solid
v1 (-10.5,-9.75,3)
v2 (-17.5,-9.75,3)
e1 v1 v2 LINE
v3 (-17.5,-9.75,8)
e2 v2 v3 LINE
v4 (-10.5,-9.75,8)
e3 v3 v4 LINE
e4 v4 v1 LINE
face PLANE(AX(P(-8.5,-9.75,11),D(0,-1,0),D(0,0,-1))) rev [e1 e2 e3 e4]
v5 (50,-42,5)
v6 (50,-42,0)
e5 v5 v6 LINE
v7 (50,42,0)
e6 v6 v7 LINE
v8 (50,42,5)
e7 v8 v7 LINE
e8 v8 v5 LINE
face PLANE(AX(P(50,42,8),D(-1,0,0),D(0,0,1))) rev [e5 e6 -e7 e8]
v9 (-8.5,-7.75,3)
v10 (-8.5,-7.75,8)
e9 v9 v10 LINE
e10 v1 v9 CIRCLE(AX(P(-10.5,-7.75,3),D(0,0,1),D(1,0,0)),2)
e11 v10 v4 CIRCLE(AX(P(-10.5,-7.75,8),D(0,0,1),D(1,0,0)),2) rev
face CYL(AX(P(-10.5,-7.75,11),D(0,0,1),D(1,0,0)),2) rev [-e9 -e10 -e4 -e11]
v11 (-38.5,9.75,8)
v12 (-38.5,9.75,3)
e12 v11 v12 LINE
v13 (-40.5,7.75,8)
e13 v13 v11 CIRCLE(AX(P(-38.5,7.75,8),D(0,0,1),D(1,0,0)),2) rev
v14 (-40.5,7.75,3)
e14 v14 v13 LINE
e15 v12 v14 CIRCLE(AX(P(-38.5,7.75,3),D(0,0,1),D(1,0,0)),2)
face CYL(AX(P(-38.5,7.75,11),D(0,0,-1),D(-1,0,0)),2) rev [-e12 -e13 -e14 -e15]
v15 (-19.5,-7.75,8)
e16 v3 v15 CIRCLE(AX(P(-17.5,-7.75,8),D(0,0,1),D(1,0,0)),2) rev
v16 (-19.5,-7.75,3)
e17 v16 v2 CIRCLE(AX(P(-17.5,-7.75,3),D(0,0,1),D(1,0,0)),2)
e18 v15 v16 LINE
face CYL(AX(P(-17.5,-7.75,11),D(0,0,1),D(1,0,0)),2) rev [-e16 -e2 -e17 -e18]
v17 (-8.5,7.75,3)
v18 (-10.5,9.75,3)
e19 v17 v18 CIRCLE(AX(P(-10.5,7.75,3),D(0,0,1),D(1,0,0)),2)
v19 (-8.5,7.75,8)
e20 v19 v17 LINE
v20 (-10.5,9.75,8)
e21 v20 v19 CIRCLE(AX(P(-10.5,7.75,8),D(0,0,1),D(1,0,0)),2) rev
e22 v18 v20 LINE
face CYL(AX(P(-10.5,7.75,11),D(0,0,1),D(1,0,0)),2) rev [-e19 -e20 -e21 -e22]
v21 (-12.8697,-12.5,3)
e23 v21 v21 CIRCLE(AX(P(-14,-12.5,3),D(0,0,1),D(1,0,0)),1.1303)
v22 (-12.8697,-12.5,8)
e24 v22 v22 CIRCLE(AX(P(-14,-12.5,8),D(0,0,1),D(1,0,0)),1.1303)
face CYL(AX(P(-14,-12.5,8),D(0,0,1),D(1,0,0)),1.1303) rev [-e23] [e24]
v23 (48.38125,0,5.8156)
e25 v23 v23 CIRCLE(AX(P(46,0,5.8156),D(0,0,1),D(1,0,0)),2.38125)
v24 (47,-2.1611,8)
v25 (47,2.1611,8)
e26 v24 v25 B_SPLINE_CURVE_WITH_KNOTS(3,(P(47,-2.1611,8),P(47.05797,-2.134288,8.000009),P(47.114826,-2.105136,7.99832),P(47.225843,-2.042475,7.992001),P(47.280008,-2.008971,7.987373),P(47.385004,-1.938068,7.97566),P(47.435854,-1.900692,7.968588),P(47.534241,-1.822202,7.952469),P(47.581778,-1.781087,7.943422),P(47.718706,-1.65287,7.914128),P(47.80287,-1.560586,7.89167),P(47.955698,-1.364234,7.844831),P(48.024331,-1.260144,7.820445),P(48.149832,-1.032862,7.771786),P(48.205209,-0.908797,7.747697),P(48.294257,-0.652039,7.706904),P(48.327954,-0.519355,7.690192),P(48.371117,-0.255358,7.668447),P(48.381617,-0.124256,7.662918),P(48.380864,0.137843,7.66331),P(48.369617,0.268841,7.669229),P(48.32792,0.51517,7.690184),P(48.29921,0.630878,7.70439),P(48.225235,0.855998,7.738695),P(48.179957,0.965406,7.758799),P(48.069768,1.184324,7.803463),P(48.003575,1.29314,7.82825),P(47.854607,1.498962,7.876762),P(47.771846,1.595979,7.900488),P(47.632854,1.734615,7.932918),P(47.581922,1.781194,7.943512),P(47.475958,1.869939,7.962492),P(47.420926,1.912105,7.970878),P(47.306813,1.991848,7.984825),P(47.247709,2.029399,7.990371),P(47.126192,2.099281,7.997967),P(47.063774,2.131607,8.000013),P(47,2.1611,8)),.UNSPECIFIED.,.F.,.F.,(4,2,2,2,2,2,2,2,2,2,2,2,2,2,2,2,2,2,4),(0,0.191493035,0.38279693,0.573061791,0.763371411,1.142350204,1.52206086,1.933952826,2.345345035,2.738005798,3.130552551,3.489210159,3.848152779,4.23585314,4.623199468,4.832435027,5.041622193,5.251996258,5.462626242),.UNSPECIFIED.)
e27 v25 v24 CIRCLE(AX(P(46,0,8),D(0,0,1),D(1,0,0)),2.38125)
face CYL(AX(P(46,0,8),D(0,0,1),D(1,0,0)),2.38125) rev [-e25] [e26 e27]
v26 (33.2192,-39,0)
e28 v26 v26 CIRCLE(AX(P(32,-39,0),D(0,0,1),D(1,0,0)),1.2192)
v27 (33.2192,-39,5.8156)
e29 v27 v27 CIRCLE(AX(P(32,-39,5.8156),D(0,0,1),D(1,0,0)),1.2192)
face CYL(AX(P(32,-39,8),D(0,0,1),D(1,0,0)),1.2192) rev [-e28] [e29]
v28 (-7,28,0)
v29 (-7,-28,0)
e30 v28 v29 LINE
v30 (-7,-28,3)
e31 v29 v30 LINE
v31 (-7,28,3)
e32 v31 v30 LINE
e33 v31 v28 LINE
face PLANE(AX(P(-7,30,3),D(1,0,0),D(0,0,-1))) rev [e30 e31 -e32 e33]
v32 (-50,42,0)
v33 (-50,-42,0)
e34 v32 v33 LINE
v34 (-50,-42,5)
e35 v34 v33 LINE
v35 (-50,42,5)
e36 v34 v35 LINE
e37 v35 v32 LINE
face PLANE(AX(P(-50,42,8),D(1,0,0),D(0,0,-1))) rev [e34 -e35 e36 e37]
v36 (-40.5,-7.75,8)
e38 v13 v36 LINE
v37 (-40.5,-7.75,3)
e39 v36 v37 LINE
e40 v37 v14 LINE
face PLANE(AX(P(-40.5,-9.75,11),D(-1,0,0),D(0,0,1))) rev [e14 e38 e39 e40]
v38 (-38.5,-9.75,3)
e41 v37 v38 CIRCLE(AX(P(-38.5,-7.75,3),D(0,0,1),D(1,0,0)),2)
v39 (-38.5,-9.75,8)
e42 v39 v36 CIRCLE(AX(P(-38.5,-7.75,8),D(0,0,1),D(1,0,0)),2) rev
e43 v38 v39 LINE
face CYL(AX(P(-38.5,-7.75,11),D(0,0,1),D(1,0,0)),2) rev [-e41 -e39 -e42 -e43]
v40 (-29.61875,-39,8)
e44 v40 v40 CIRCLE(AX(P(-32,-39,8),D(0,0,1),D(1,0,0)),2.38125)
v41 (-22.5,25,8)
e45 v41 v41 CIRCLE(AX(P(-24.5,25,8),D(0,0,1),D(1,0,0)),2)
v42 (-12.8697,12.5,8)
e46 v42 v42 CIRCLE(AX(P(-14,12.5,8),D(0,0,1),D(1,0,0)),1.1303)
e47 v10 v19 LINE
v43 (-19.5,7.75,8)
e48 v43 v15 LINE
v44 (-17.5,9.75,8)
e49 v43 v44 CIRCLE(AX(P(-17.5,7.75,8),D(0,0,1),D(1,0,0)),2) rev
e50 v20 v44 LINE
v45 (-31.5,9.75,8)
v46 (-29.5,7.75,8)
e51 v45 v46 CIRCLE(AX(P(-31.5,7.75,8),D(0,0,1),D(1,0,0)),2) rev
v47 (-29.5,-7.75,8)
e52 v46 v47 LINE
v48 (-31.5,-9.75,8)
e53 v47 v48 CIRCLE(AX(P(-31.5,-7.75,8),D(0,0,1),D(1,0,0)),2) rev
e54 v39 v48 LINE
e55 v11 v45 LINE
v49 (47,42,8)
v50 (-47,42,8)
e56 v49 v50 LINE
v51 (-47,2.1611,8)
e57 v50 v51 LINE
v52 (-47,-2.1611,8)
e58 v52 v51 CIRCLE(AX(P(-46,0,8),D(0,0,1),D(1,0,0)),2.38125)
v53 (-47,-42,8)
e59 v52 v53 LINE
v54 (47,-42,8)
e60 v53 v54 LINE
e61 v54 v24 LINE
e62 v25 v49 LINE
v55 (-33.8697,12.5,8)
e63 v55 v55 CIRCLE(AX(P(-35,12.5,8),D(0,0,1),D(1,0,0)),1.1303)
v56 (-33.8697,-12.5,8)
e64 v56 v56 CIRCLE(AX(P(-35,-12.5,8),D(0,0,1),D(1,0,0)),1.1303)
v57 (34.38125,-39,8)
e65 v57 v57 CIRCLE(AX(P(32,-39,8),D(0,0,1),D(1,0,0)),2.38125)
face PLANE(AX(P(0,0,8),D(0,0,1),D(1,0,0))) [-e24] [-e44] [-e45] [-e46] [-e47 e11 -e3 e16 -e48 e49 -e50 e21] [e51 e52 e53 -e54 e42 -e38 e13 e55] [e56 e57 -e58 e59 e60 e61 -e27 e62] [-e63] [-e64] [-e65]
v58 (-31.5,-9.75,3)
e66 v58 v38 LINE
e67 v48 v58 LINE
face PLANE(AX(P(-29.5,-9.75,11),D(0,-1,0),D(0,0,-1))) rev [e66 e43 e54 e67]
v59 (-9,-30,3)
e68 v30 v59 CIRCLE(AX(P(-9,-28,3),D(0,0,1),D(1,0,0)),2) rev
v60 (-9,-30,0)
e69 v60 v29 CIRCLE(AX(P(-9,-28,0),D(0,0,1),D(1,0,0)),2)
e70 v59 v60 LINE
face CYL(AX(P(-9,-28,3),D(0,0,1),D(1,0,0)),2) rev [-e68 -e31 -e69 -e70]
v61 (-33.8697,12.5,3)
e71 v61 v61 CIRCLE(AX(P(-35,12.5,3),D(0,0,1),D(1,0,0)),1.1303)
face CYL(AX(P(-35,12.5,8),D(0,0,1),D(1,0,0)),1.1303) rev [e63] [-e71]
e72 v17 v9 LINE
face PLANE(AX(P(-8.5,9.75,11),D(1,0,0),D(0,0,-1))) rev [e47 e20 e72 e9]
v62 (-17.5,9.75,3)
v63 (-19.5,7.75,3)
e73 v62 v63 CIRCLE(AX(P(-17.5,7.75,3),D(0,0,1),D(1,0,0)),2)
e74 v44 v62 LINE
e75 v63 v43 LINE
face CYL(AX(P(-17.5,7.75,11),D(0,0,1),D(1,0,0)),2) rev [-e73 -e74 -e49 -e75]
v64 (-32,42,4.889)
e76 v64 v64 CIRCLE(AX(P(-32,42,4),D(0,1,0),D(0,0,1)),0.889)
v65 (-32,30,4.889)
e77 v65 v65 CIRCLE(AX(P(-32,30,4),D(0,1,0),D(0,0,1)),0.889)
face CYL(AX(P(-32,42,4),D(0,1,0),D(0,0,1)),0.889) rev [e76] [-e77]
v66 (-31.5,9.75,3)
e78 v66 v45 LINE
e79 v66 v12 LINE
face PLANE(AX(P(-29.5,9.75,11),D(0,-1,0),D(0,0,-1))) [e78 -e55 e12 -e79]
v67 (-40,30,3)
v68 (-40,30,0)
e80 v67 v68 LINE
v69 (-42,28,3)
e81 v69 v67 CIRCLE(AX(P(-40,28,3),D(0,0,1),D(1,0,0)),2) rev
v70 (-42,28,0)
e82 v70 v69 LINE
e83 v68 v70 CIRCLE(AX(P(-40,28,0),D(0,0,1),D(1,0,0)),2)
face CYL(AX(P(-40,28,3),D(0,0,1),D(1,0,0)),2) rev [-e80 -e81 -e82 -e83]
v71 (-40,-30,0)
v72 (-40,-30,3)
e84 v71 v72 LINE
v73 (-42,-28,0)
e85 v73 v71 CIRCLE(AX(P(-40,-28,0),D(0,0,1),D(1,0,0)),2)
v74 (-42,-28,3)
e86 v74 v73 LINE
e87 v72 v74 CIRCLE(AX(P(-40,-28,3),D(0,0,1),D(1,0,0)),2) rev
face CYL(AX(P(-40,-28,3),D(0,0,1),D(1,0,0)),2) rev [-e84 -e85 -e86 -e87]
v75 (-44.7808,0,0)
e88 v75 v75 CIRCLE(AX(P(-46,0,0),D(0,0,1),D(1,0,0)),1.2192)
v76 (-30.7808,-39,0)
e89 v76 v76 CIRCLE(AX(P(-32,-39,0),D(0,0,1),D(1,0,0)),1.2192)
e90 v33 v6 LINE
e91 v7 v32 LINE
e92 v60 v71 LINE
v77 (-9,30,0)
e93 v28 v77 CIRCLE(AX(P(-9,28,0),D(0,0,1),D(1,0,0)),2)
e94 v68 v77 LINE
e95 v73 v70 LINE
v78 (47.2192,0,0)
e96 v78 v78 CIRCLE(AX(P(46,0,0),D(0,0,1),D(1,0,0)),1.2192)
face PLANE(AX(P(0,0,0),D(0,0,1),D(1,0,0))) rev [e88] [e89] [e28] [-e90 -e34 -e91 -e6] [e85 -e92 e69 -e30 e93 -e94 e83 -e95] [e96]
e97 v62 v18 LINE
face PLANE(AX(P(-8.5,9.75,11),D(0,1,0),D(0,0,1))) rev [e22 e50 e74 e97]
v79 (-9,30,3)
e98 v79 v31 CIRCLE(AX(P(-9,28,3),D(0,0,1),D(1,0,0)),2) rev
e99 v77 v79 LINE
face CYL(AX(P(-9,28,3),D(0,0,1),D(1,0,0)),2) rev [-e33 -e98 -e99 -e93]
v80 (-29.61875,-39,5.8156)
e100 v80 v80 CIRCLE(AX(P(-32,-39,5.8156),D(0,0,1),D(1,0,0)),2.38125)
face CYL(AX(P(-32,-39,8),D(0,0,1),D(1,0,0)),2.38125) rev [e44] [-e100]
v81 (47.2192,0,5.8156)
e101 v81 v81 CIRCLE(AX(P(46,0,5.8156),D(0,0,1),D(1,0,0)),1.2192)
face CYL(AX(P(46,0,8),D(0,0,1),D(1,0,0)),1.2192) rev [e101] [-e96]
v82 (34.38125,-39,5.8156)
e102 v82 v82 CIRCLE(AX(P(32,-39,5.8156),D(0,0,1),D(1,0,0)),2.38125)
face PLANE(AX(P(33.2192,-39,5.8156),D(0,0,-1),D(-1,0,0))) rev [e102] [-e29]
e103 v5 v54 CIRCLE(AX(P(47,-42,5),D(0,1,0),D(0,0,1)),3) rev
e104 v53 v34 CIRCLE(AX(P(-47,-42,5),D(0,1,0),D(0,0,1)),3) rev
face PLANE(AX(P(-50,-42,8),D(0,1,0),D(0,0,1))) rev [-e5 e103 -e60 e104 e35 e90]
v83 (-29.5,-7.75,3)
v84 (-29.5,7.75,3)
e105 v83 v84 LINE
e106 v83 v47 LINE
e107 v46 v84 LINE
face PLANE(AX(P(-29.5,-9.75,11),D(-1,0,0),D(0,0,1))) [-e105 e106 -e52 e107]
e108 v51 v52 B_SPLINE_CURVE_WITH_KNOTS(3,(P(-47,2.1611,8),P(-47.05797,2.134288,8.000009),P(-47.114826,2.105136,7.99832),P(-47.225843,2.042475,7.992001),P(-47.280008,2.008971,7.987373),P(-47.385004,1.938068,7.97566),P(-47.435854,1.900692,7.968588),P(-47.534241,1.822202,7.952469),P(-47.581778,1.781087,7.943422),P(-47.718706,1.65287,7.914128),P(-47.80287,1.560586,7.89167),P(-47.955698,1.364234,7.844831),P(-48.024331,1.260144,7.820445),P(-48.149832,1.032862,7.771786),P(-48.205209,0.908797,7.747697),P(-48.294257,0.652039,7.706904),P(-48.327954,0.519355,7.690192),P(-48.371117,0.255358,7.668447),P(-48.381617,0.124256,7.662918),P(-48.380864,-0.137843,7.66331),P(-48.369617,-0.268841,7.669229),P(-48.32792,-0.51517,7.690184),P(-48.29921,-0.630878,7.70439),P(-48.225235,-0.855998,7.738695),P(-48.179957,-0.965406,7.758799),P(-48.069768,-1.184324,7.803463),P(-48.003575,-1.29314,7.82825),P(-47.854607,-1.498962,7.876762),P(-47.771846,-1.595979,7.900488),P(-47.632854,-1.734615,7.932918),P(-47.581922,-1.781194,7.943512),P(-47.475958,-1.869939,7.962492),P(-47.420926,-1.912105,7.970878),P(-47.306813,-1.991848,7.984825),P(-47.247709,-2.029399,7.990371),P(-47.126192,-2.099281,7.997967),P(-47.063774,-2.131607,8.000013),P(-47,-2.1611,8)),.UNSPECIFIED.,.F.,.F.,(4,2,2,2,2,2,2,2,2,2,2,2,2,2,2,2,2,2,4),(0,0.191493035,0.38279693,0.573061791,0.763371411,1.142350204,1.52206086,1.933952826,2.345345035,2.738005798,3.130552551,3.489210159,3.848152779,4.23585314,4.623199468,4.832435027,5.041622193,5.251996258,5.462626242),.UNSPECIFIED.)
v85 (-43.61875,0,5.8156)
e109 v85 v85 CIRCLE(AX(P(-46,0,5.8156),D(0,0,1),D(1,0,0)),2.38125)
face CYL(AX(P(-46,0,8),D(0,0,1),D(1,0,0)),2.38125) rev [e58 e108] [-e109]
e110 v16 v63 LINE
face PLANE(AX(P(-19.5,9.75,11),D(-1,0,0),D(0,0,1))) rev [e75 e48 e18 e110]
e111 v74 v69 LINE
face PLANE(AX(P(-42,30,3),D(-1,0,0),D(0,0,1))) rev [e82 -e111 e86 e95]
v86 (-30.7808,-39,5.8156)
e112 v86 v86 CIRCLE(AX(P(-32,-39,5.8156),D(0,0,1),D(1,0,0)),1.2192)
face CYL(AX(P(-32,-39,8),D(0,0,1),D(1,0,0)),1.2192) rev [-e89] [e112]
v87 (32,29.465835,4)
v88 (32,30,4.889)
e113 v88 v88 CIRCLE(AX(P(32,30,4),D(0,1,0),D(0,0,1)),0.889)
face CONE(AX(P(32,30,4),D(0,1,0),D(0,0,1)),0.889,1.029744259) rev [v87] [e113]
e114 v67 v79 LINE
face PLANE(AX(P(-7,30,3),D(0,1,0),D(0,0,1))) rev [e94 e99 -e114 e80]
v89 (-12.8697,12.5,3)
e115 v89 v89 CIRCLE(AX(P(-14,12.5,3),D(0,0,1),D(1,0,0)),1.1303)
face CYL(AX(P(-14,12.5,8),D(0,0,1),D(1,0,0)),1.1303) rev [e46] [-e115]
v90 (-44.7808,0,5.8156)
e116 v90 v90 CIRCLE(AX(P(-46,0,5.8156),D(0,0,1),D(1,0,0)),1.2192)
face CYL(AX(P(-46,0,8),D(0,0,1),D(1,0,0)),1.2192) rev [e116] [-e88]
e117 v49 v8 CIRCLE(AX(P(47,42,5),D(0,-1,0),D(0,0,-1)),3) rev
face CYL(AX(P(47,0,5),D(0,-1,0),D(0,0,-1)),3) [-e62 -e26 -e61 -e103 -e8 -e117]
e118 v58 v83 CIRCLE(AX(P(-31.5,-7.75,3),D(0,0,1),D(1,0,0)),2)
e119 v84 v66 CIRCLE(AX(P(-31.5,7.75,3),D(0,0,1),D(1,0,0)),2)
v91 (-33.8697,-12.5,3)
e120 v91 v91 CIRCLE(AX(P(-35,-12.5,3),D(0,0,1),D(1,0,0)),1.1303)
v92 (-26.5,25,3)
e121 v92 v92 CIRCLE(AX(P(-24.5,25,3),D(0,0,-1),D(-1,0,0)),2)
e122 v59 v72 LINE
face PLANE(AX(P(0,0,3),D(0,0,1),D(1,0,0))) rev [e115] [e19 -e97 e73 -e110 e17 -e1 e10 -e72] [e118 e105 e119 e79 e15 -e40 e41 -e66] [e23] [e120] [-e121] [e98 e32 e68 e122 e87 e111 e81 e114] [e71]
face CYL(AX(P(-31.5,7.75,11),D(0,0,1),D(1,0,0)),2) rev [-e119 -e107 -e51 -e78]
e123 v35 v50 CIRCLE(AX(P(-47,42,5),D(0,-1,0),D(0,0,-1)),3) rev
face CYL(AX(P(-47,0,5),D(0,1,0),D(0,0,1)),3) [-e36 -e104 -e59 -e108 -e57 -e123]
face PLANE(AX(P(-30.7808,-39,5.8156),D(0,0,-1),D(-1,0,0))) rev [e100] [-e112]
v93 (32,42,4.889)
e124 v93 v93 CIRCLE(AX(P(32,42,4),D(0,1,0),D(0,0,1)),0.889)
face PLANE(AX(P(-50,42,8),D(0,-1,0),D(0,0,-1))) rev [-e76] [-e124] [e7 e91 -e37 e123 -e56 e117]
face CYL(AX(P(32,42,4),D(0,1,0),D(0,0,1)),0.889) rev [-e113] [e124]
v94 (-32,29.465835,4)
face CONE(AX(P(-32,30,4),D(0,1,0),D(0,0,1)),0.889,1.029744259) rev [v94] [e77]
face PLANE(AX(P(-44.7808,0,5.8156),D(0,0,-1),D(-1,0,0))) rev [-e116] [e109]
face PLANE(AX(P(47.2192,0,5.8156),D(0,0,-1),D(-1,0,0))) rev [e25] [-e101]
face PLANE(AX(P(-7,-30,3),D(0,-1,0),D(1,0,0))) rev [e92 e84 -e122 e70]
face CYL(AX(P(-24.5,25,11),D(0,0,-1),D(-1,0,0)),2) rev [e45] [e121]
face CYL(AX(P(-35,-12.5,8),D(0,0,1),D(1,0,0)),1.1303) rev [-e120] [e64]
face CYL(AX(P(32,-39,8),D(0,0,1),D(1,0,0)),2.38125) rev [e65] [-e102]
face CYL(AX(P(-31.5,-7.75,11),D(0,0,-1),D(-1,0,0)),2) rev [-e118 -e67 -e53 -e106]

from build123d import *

# Parameters (mm, degrees)
SKETCH1_W                                      = 100
SKETCH1_H                                      = 84
BOSS_EXTRUDE1_DEPTH                            = 8
CBORE_FOR_2_SOCKET_HEAD_CAP_SCREW1_D           = 2.4384
CBORE_FOR_2_SOCKET_HEAD_CAP_SCREW1_DEPTH       = 12.27
CBORE_FOR_2_SOCKET_HEAD_CAP_SCREW1_CBORE_D     = 4.7625
CBORE_FOR_2_SOCKET_HEAD_CAP_SCREW1_CBORE_DEPTH = 2.1844
CBORE_FOR_2_SOCKET_HEAD_CAP_SCREW1_TIP         = 0.732569267
CBORE_FOR_2_SOCKET_HEAD_CAP_SCREW2_D           = 2.4384
CBORE_FOR_2_SOCKET_HEAD_CAP_SCREW2_DEPTH       = 12.27
CBORE_FOR_2_SOCKET_HEAD_CAP_SCREW2_CBORE_D     = 4.7625
CBORE_FOR_2_SOCKET_HEAD_CAP_SCREW2_CBORE_DEPTH = 2.1844
CBORE_FOR_2_SOCKET_HEAD_CAP_SCREW2_TIP         = 0.732569267
F_2_56_TAPPED_HOLE1_D                          = 1.778
F_2_56_TAPPED_HOLE1_DEPTH                      = 12
F_2_56_TAPPED_HOLE1_TIP                        = 0.53416509
SKETCH12_W                                     = 35
SKETCH12_H                                     = 60
CUT_EXTRUDE3_DEPTH                             = 3
FILLET1_R                                      = 2
FILLET2_R                                      = 2
FILLET3_R                                      = 2
FILLET4_R                                      = 2
SKETCH17_W                                     = 11
SKETCH17_H                                     = 19.5
CUT_EXTRUDE4_DEPTH                             = 8
SKETCH16_W                                     = 11
SKETCH16_H                                     = 19.5
CUT_EXTRUDE5_DEPTH                             = 8
FILLET5_R                                      = 2
FILLET6_R                                      = 2
FILLET7_R                                      = 2
FILLET8_R                                      = 2
F_4_40_TAPPED_HOLE1_D                          = 2.2606
SKETCH21_R                                     = 2
CUT_EXTRUDE6_DEPTH                             = 8
FILLET9_R                                      = 3


with BuildPart() as part:
    # Sketch1 → Boss-Extrude1 (new body)
    with BuildSketch(Plane.XY):
        Rectangle(SKETCH1_W, SKETCH1_H)
    extrude(amount=BOSS_EXTRUDE1_DEPTH)

    # CBORE for #2 Socket Head Cap Screw1
    with Locations(Plane(origin=(-32, -39, 8), x_dir=(1, 0, 0), z_dir=(0, 0, 1))):
        with Locations((0, 0), (64, 0)):
            CounterBoreHole(CBORE_FOR_2_SOCKET_HEAD_CAP_SCREW1_D / 2, CBORE_FOR_2_SOCKET_HEAD_CAP_SCREW1_CBORE_D / 2, CBORE_FOR_2_SOCKET_HEAD_CAP_SCREW1_CBORE_DEPTH, depth=CBORE_FOR_2_SOCKET_HEAD_CAP_SCREW1_DEPTH)
            with Locations((0, 0, -(CBORE_FOR_2_SOCKET_HEAD_CAP_SCREW1_DEPTH + CBORE_FOR_2_SOCKET_HEAD_CAP_SCREW1_TIP / 2))):  # 118° drill point
                Cone(0, CBORE_FOR_2_SOCKET_HEAD_CAP_SCREW1_D / 2, CBORE_FOR_2_SOCKET_HEAD_CAP_SCREW1_TIP, mode=Mode.SUBTRACT)

    # CBORE for #2 Socket Head Cap Screw2
    with Locations(Plane(origin=(-46, 0, 8), x_dir=(1, 0, 0), z_dir=(0, 0, 1))):
        with Locations((0, 0), (92, 0)):
            CounterBoreHole(CBORE_FOR_2_SOCKET_HEAD_CAP_SCREW2_D / 2, CBORE_FOR_2_SOCKET_HEAD_CAP_SCREW2_CBORE_D / 2, CBORE_FOR_2_SOCKET_HEAD_CAP_SCREW2_CBORE_DEPTH, depth=CBORE_FOR_2_SOCKET_HEAD_CAP_SCREW2_DEPTH)
            with Locations((0, 0, -(CBORE_FOR_2_SOCKET_HEAD_CAP_SCREW2_DEPTH + CBORE_FOR_2_SOCKET_HEAD_CAP_SCREW2_TIP / 2))):  # 118° drill point
                Cone(0, CBORE_FOR_2_SOCKET_HEAD_CAP_SCREW2_D / 2, CBORE_FOR_2_SOCKET_HEAD_CAP_SCREW2_TIP, mode=Mode.SUBTRACT)

    # #2-56 Tapped Hole1
    with Locations(Plane(origin=(-32, 42, 4), x_dir=(0, 0, 1), z_dir=(0, 1, 0))):
        with Locations((0, 0), (0, 64)):
            Hole(F_2_56_TAPPED_HOLE1_D / 2, depth=F_2_56_TAPPED_HOLE1_DEPTH)
            with Locations((0, 0, -(F_2_56_TAPPED_HOLE1_DEPTH + F_2_56_TAPPED_HOLE1_TIP / 2))):  # 118° drill point
                Cone(0, F_2_56_TAPPED_HOLE1_D / 2, F_2_56_TAPPED_HOLE1_TIP, mode=Mode.SUBTRACT)

    # Sketch12 → Cut-Extrude3 (cut)
    with BuildSketch(Plane(origin=(0, 0, 0), x_dir=(-1, 0, 0), z_dir=(0, 0, -1))):
        with Locations((24.5, 0)):
            Rectangle(SKETCH12_W, SKETCH12_H)
    extrude(amount=-CUT_EXTRUDE3_DEPTH, mode=Mode.SUBTRACT)

    # Fillet1
    fillet1_edges = [part.edges().sort_by_distance(p)[0] for p in [
        (-7, 30, 1.5),
    ]]
    fillet(fillet1_edges, radius=FILLET1_R)

    # Fillet2
    fillet2_edges = [part.edges().sort_by_distance(p)[0] for p in [
        (-42, 30, 1.5),
    ]]
    fillet(fillet2_edges, radius=FILLET2_R)

    # Fillet3
    fillet3_edges = [part.edges().sort_by_distance(p)[0] for p in [
        (-42, -30, 1.5),
    ]]
    fillet(fillet3_edges, radius=FILLET3_R)

    # Fillet4
    fillet4_edges = [part.edges().sort_by_distance(p)[0] for p in [
        (-7, -30, 1.5),
    ]]
    fillet(fillet4_edges, radius=FILLET4_R)

    # Sketch17 → Cut-Extrude4 (cut)
    with BuildSketch(Plane(origin=(0, 0, 3), x_dir=(-1, 0, 0), z_dir=(0, 0, -1))):
        with Locations((35, 0)):
            Rectangle(SKETCH17_W, SKETCH17_H)
    extrude(amount=-CUT_EXTRUDE4_DEPTH, mode=Mode.SUBTRACT)

    # Sketch16 → Cut-Extrude5 (cut)
    with BuildSketch(Plane(origin=(0, 0, 3), x_dir=(-1, 0, 0), z_dir=(0, 0, -1))):
        with Locations((14, 0)):
            Rectangle(SKETCH16_W, SKETCH16_H)
    extrude(amount=-CUT_EXTRUDE5_DEPTH, mode=Mode.SUBTRACT)

    # Fillet5
    fillet5_edges = [part.edges().sort_by_distance(p)[0] for p in [
        (-40.5, 9.75, 5.5),
        (-19.5, 9.75, 5.5),
    ]]
    fillet(fillet5_edges, radius=FILLET5_R)

    # Fillet6
    fillet6_edges = [part.edges().sort_by_distance(p)[0] for p in [
        (-29.5, 9.75, 5.5),
        (-8.5, 9.75, 5.5),
    ]]
    fillet(fillet6_edges, radius=FILLET6_R)

    # Fillet7
    fillet7_edges = [part.edges().sort_by_distance(p)[0] for p in [
        (-29.5, -9.75, 5.5),
        (-8.5, -9.75, 5.5),
    ]]
    fillet(fillet7_edges, radius=FILLET7_R)

    # Fillet8
    fillet8_edges = [part.edges().sort_by_distance(p)[0] for p in [
        (-40.5, -9.75, 5.5),
        (-19.5, -9.75, 5.5),
    ]]
    fillet(fillet8_edges, radius=FILLET8_R)

    # #4-40 Tapped Hole1 (through all)
    with Locations(Plane(origin=(-35, 12.5, 8), x_dir=(1, 0, 0), z_dir=(0, 0, 1))):
        with Locations((0, 0), (0, -25), (21, -25), (21, 0)):
            Hole(F_4_40_TAPPED_HOLE1_D / 2)

    # Sketch21 → Cut-Extrude6 (cut)
    with BuildSketch(Plane(origin=(0, 0, 3), x_dir=(-1, 0, 0), z_dir=(0, 0, -1))):
        with Locations((24.5, 25)):
            Circle(SKETCH21_R)
    extrude(amount=-CUT_EXTRUDE6_DEPTH, mode=Mode.SUBTRACT)

    # Fillet9
    # the kernel refuses this fillet: 3 mm, written as the material it takes off along each edge
    with BuildSketch(Plane(origin=(-50, -49.5, 8), x_dir=(1, 0, 0), z_dir=(0, 1, 0)), Plane(origin=(50, 49.5, 8), x_dir=(-1, 0, 0), z_dir=(0, -1, 0))) as fillet9_piece_1:
        with BuildLine():
            CenterArc((FILLET9_R, FILLET9_R), FILLET9_R, 180, 90)
            Line((0, FILLET9_R), (0, 0))
            Line((0, 0), (FILLET9_R, 0))
        make_face()
    extrude(amount=99, mode=Mode.SUBTRACT)


solid = part.part
